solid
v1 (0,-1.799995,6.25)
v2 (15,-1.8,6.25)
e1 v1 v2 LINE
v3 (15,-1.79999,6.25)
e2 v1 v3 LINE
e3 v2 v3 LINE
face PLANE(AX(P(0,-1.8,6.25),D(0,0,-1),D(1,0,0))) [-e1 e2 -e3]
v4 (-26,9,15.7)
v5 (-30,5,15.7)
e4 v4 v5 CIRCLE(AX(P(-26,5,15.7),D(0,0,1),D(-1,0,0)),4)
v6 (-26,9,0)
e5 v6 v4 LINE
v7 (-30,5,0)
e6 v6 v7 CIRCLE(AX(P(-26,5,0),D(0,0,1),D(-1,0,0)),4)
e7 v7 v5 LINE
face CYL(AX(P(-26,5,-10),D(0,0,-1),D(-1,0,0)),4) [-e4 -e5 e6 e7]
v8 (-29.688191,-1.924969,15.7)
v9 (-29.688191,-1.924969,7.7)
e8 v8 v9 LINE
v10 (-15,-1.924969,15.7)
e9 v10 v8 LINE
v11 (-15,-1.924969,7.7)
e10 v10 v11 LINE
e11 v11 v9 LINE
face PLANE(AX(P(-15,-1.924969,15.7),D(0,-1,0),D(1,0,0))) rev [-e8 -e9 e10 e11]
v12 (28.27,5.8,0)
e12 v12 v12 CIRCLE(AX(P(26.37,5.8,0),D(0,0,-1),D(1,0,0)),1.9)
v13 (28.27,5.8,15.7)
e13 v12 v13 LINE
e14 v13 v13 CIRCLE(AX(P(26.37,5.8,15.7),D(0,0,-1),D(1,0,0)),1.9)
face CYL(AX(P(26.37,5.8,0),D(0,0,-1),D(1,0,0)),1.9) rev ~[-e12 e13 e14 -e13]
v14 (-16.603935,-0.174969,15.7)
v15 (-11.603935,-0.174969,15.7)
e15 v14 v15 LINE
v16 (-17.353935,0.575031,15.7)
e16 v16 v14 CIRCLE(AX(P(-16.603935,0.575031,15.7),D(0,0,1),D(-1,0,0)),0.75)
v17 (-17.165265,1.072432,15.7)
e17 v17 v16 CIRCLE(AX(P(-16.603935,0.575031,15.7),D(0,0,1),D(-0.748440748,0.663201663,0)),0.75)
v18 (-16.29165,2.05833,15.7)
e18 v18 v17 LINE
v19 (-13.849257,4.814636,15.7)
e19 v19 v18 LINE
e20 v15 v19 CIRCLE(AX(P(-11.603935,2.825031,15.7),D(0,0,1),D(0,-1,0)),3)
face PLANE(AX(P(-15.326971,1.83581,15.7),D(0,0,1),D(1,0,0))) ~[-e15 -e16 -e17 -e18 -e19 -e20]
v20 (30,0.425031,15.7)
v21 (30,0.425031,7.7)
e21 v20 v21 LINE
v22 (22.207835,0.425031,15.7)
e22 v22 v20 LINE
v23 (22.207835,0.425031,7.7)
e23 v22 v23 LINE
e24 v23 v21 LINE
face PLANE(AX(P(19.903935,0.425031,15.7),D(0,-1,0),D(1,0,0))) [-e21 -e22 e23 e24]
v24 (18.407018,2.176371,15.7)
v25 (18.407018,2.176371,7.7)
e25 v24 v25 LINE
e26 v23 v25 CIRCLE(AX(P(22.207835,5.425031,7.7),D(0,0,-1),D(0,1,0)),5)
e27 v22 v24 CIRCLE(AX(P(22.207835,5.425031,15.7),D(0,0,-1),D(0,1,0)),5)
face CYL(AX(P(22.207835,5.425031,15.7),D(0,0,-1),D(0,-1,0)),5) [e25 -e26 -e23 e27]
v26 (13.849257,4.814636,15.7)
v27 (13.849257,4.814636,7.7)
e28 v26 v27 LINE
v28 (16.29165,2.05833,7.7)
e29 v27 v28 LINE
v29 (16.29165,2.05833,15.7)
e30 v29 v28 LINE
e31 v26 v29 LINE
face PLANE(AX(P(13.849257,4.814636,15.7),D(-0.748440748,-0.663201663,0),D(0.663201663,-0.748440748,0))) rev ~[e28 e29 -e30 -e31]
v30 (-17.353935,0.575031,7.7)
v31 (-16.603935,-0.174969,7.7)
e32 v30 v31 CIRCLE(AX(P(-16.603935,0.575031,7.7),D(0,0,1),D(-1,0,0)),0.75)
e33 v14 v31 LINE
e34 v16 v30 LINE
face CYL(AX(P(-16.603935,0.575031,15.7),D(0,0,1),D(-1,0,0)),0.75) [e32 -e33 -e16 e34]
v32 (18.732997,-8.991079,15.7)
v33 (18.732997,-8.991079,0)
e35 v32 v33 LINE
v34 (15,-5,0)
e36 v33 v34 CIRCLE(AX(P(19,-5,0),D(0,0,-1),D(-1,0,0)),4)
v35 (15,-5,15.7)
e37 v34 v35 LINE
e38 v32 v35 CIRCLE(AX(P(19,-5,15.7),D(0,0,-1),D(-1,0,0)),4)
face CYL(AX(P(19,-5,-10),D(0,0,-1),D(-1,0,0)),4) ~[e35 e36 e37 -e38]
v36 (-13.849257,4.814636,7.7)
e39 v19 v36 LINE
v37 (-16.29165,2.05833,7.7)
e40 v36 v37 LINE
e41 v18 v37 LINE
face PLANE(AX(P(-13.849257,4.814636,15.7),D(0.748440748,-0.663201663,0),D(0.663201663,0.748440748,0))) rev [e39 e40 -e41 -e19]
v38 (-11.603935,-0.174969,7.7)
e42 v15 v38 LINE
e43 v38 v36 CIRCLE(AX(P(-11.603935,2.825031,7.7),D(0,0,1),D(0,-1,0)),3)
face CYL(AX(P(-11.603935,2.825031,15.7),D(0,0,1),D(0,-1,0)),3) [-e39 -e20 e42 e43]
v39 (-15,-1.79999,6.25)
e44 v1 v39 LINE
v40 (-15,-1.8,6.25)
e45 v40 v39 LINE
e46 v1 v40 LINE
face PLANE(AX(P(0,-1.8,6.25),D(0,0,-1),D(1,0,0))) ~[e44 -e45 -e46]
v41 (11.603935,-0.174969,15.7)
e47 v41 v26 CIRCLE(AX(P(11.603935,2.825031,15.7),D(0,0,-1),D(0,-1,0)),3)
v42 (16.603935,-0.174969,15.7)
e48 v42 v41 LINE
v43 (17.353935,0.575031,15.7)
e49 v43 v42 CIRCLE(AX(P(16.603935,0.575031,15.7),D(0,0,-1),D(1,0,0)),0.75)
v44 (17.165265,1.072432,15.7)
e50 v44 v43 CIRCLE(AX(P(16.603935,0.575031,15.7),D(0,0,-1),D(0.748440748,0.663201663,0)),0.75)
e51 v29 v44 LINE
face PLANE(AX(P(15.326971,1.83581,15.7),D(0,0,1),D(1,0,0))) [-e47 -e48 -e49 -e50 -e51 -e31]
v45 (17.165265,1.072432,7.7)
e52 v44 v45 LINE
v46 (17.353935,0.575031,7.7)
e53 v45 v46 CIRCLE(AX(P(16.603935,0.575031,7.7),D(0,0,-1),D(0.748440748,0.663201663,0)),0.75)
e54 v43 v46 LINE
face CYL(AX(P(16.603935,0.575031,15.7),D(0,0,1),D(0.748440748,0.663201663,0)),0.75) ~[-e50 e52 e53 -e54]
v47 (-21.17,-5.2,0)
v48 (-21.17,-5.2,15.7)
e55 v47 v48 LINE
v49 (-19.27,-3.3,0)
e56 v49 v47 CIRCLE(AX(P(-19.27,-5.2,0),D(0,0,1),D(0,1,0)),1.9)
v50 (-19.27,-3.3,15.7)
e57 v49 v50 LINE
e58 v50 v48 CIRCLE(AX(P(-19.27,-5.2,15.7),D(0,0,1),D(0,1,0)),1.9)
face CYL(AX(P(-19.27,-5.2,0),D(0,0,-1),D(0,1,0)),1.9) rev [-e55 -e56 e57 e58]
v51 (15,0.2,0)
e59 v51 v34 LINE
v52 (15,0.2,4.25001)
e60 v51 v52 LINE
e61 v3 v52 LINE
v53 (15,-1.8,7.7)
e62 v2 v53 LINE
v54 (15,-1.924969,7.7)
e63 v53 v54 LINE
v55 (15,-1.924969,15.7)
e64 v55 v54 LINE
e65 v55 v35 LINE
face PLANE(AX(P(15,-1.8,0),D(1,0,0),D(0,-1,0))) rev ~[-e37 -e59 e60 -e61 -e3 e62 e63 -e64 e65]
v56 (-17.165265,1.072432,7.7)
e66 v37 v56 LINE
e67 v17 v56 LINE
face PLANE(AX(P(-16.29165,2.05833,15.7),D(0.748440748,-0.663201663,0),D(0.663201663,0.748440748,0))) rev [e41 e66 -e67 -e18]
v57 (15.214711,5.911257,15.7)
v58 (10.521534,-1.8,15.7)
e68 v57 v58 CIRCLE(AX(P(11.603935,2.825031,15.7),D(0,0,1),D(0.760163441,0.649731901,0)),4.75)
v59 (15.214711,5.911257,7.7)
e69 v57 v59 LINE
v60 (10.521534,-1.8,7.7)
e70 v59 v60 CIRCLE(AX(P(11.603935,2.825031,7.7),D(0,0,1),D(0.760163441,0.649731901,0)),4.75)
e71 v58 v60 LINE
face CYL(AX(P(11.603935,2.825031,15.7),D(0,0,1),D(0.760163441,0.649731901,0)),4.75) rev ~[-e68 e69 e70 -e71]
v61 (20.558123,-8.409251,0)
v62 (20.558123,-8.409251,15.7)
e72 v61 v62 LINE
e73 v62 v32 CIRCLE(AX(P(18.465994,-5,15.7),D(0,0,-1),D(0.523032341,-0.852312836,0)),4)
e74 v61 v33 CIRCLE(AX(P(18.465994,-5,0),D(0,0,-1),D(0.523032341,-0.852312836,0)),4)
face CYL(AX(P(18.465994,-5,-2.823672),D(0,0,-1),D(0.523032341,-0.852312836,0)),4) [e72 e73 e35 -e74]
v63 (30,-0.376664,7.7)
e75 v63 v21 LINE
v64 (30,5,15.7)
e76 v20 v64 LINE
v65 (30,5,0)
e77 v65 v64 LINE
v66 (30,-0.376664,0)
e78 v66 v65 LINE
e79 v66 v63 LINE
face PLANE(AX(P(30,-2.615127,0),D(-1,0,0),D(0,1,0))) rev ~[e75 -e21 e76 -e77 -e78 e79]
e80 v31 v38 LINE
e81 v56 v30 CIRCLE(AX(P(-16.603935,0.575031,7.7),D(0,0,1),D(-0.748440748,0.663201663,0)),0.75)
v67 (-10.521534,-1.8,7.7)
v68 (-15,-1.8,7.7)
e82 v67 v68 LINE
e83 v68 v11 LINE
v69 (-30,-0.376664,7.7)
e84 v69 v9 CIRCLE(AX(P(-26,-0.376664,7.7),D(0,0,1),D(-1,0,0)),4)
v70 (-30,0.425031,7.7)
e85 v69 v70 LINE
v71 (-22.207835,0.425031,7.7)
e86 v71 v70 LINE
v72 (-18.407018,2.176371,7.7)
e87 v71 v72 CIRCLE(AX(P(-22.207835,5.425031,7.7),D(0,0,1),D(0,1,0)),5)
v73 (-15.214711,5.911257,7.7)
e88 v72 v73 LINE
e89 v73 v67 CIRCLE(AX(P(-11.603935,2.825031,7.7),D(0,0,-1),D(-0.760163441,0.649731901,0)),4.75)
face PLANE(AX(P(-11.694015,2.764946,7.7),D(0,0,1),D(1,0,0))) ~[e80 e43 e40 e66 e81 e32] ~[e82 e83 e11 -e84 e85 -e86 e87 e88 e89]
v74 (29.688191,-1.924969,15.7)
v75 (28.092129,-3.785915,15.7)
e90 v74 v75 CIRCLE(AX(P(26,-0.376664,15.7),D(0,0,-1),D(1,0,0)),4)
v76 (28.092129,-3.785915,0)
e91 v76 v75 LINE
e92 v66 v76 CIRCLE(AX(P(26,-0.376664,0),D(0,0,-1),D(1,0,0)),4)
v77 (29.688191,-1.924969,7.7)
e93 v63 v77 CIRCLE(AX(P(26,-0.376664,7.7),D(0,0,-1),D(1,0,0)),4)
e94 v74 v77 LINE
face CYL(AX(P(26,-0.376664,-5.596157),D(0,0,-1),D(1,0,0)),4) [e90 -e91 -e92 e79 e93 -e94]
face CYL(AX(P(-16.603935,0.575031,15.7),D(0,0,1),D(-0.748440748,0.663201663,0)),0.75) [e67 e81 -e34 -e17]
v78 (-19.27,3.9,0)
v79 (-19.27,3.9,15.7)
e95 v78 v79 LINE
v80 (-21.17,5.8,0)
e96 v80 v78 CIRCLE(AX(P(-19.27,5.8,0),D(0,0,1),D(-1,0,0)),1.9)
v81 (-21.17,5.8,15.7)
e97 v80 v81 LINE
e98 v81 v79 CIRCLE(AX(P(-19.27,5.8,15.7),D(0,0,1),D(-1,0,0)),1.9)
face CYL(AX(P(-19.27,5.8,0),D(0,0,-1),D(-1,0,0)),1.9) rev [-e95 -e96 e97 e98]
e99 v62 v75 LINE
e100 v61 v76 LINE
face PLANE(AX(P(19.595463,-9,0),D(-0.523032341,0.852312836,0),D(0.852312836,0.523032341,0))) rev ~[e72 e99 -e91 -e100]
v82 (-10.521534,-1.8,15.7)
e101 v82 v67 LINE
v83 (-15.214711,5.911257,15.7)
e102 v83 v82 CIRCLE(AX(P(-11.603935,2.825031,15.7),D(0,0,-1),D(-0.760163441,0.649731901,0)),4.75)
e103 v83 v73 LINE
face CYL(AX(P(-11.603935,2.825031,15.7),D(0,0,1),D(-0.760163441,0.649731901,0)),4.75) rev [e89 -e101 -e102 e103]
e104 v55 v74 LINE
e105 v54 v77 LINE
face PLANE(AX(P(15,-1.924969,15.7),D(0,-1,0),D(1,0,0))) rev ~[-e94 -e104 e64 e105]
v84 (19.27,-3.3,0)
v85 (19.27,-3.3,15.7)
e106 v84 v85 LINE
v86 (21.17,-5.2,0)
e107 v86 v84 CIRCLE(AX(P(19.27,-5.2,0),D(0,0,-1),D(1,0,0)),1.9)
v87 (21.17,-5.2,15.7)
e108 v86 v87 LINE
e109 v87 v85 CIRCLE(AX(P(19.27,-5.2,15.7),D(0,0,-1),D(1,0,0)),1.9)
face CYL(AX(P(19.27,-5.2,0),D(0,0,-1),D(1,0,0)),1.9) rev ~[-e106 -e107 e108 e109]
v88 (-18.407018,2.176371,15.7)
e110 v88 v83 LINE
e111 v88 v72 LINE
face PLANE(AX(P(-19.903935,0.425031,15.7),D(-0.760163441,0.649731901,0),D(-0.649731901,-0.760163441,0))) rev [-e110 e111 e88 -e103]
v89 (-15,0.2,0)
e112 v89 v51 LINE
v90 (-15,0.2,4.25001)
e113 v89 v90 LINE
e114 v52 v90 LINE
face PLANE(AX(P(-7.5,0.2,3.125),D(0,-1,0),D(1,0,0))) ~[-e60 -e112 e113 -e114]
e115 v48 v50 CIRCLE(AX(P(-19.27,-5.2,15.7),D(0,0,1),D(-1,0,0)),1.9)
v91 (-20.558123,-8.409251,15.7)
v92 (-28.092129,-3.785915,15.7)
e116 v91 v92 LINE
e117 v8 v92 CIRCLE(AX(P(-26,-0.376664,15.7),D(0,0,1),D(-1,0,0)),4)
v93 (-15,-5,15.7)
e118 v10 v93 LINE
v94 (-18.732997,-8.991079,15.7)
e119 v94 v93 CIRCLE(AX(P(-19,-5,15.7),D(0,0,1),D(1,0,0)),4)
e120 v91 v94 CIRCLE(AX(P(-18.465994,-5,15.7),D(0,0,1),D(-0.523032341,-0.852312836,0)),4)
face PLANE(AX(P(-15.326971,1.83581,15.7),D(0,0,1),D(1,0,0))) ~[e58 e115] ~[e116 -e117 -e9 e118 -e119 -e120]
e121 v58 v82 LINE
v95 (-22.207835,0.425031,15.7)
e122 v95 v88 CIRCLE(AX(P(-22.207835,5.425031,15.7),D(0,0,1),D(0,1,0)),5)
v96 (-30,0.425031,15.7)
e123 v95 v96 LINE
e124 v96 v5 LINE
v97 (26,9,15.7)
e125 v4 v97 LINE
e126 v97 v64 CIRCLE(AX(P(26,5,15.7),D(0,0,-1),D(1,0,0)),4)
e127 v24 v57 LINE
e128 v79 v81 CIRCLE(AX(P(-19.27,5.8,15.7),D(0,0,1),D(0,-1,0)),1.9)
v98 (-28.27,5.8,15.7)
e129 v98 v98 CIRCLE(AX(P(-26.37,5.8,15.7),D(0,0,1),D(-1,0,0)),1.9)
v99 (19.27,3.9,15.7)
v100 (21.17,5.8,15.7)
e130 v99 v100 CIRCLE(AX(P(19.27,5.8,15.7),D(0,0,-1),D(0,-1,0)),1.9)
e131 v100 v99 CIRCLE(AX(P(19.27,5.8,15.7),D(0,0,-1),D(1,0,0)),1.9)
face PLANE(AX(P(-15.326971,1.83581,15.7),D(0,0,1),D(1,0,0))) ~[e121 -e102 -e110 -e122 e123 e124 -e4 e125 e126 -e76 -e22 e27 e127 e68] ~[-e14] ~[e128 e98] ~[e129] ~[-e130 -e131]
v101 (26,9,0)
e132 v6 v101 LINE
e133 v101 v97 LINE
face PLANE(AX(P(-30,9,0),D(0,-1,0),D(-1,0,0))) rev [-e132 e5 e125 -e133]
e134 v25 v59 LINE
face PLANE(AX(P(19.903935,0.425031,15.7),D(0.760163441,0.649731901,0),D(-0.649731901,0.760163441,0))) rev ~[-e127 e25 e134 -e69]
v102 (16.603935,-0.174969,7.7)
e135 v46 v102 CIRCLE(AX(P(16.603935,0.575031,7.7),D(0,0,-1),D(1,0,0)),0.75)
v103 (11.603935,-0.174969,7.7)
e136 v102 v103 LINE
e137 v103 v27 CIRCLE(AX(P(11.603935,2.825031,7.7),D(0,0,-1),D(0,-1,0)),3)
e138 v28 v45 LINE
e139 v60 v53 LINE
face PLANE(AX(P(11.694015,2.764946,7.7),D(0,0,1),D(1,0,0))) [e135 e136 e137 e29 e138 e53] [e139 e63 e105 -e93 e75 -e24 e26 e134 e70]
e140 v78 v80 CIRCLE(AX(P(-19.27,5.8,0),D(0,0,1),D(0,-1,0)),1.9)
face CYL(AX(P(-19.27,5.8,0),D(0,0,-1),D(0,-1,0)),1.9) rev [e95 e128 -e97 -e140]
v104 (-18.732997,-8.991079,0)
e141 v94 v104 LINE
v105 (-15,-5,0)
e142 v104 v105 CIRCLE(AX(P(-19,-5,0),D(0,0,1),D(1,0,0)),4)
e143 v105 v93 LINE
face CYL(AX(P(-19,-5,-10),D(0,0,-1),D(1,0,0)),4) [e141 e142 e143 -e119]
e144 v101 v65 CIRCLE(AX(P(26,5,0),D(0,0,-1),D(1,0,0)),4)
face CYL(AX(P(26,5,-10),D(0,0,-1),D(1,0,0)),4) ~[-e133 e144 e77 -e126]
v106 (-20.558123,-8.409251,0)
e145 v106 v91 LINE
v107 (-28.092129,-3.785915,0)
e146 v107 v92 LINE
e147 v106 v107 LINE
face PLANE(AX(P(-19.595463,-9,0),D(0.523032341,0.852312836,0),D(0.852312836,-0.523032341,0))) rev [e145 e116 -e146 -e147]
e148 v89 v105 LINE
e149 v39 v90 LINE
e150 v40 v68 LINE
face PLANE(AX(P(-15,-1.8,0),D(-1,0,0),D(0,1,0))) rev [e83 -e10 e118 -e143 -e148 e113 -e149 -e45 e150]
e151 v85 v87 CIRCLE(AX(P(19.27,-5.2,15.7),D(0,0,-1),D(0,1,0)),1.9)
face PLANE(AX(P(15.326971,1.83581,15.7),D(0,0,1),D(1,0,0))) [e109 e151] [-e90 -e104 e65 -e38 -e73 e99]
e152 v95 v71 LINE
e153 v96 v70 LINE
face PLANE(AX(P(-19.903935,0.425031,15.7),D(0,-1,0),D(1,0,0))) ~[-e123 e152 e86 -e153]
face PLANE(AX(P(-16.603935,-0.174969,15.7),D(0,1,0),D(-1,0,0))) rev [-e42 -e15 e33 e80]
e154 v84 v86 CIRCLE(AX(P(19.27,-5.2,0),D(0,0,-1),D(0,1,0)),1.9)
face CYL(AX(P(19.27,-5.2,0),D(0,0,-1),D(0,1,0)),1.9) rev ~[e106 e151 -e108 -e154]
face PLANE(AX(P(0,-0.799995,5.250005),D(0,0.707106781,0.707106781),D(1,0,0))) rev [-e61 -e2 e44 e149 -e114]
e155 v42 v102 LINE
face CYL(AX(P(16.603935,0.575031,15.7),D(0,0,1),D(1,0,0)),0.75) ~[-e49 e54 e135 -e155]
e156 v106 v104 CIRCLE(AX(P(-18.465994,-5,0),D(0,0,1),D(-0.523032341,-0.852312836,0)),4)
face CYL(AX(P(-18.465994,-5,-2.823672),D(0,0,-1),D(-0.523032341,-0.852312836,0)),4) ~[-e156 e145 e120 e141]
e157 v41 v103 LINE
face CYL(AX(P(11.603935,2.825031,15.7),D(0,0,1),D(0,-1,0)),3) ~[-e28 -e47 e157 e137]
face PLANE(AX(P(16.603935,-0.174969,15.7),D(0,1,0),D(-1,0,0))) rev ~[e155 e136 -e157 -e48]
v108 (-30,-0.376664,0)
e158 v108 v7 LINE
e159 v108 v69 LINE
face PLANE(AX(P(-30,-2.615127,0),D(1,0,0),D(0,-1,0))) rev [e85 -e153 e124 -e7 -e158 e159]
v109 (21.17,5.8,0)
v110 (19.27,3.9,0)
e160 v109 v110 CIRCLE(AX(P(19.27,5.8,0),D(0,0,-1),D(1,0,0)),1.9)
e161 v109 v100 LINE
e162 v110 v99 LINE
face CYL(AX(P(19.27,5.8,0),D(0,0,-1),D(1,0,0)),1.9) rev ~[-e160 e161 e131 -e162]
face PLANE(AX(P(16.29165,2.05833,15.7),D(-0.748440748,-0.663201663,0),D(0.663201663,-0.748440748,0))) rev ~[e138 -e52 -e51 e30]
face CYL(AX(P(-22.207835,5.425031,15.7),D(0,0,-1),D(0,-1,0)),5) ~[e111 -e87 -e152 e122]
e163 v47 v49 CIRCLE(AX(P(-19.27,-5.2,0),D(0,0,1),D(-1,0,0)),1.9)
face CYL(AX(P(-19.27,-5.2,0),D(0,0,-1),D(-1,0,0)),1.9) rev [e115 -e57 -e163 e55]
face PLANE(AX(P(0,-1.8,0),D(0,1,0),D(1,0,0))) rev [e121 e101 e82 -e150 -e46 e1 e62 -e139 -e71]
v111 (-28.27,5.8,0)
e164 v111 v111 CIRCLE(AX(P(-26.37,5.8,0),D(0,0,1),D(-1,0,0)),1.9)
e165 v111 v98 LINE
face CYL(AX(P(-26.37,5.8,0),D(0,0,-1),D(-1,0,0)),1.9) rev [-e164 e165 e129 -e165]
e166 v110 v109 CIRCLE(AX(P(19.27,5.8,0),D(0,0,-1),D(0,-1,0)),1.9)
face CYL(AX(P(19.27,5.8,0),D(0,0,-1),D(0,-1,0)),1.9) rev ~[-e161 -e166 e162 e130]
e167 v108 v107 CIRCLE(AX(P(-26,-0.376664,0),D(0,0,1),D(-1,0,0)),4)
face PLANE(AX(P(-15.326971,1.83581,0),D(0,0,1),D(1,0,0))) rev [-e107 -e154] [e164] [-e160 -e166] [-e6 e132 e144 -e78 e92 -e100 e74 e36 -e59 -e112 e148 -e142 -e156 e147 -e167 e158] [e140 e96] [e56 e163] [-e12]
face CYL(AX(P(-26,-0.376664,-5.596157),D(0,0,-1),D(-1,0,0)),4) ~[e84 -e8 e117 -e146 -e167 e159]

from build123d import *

# Parameters (mm, degrees)
F1_DEPTH    = 15.7
F2_W        = 10.0960650777
F2_H        = 2.35
F3_DEPTH    = 8
F4_R        = 5
F5_T1_DEPTH = 26.8923143391
F5_T3_DEPTH = 21.3473434867
F5_T5_DEPTH = 35.7
F6_W        = 15
F6_H        = 6.25
F7_DEPTH    = 2
F8_SIZE     = 1.99999


# Not quite as in the source:
# - a fillet or chamfer that OpenCascade refuses, or shapes differently, is made with other operations: its cross-section is extruded or revolved along the edge and cut away or added
# - a fillet or chamfer is up to 0.001 mm smaller than in the source, because OpenCascade refuses the exact size


with BuildPart() as f1:
    # F0 (on Top) → F1 (new body)
    with BuildSketch(Plane.XY):
        Polygon((30, 9), (0, 9), (0, -1.8), (15, -1.8), (15, -9), (19.5954625243, -9), (30, -2.6151265483), align=None)
        with BuildLine():
            ThreePointArc((21.17, -5.2), (17.9264971157, -6.5435028843), (19.27, -3.3))
            ThreePointArc((19.27, -3.3), (20.6135028843, -3.8564971157), (21.17, -5.2))
        make_face(mode=Mode.SUBTRACT)
        with BuildLine():
            ThreePointArc((19.27, 3.9), (17.9264971157, 7.1435028843), (21.17, 5.8))
            ThreePointArc((21.17, 5.8), (20.6135028843, 4.4564971157), (19.27, 3.9))
        make_face(mode=Mode.SUBTRACT)
        with BuildLine():
            ThreePointArc((24.47, 5.8), (26.37, 7.7), (28.27, 5.8))
            ThreePointArc((28.27, 5.8), (26.37, 3.9), (24.47, 5.8))
        make_face(mode=Mode.SUBTRACT)
    extrude(amount=F1_DEPTH)

    # F2 (on face) → F3 (cut)
    with BuildSketch(Plane.XY.offset(15.7)):
        with BuildLine():
            ThreePointArc((11.6039349223, -0.1749693412), (8.8681704068, 4.0561246908), (13.8492571677, 4.8146356484))
            Line((13.8492571677, 4.8146356484), (16.291649806, 2.0583304766))
            ThreePointArc((16.291649806, 2.0583304766), (16.3383380366, 2.4404176698), (16.3539349223, 2.8250306588))
            ThreePointArc((16.3539349223, 2.8250306588), (16.0600367861, 4.4699185515), (15.2147112678, 5.9112571869))
            ThreePointArc((15.2147112678, 5.9112571869), (7.5463441808, 5.2945361506), (10.5215341623, -1.8))
            Line((10.5215341623, -1.8), (12.6863356823, -1.8))
            ThreePointArc((12.6863356823, -1.8), (14.1212348386, -1.2030831841), (15.286664888, -0.1749693412))
            Line((15.286664888, -0.1749693412), (11.6039349223, -0.1749693412))
        make_face()
        with BuildLine():
            ThreePointArc((16.3539349223, 2.8250306588), (16.3383380366, 2.4404176698), (16.291649806, 2.0583304766))
            Line((16.291649806, 2.0583304766), (17.1652654837, 1.0724319062))
            ThreePointArc((17.1652654837, 1.0724319062), (17.3051830671, 0.8410213344), (17.3539349223, 0.5750306588))
            ThreePointArc((17.3539349223, 0.5750306588), (17.1342650082, 0.0447005729), (16.6039349223, -0.1749693412))
            Line((16.6039349223, -0.1749693412), (15.286664888, -0.1749693412))
            ThreePointArc((15.286664888, -0.1749693412), (14.1212348386, -1.2030831841), (12.6863356823, -1.8))
            Line((12.6863356823, -1.8), (15, -1.8))
            Line((15, -1.8), (15, -1.9249693412))
            Line((15, -1.9249693412), (19.9039349223, -1.9249693412))
            Line((19.9039349223, -1.9249693412), (19.9039349223, 0.4250306588))
            Line((19.9039349223, 0.4250306588), (15.2147112678, 5.9112571869))
            ThreePointArc((15.2147112678, 5.9112571869), (16.0600367861, 4.4699185515), (16.3539349223, 2.8250306588))
        make_face()
        with Locations((24.9519674612, -0.7499693412)):
            Rectangle(F2_W, F2_H)
    extrude(amount=-F3_DEPTH, mode=Mode.SUBTRACT)

    # F4
    f4_edges = [f1.edges().sort_by_distance(p)[0] for p in [
        (19.903935, 0.425031, 11.7),
    ]]
    fillet(f4_edges, radius=F4_R)

    # F5: fillet of radius 4 on 4 edges, made by hand

    # F5_s2 → F5_t1 (cut)
    with BuildSketch(Plane.XY.offset(-5.5961571696)):
        with BuildLine():
            ThreePointArc((30, -0.3766636805), (29.4905957559, -2.3300559271), (28.0921293656, -3.7859150232))
            Line((28.0921293656, -3.7859150232), (30, -2.6151265483))
            Line((30, -2.6151265483), (30, -0.3766636805))
        make_face()
    extrude(amount=F5_T1_DEPTH, mode=Mode.SUBTRACT)

    # F5_s4 → F5_t3 (cut)
    with BuildSketch(Plane.XY.offset(-2.8236717433)):
        with BuildLine():
            ThreePointArc((20.5581231925, -8.4092513427), (19.5529608525, -8.8494808332), (18.465993827, -9))
            Line((18.465993827, -9), (19.5954625243, -9))
            Line((19.5954625243, -9), (20.5581231925, -8.4092513427))
        make_face()
    extrude(amount=F5_T3_DEPTH, mode=Mode.SUBTRACT)

    # F5_s6 → F5_t5 (cut)
    with BuildSketch(Plane.XY.offset(-10)):
        with BuildLine():
            ThreePointArc((15, -5), (16.1715728753, -7.8284271247), (19, -9))
            Line((19, -9), (15, -9))
            Line((15, -9), (15, -5))
        make_face()
        with BuildLine():
            ThreePointArc((30, 5), (28.8284271247, 7.8284271247), (26, 9))
            Line((26, 9), (30, 9))
            Line((30, 9), (30, 5))
        make_face()
    extrude(amount=F5_T5_DEPTH, mode=Mode.SUBTRACT)

    # F6 (on face) → F7 (cut)
    with BuildSketch(Plane.XZ.offset(1.8)):
        with Locations((7.5, 3.125)):
            Rectangle(F6_W, F6_H)
    extrude(amount=-F7_DEPTH, mode=Mode.SUBTRACT)

    # F8 (size 2 in the source; OpenCascade refuses exactly that, so slightly less here)
    f8_edges = [f1.edges().sort_by_distance(p)[0] for p in [
        (7.5, 0.2, 6.25),
    ]]
    chamfer(f8_edges, length=F8_SIZE)

    # F9: F1 across plane


with BuildPart() as f1_1:
    add(f1.part)
    add(f1.part.mirror(Plane.YZ))


solid = f1_1.part
